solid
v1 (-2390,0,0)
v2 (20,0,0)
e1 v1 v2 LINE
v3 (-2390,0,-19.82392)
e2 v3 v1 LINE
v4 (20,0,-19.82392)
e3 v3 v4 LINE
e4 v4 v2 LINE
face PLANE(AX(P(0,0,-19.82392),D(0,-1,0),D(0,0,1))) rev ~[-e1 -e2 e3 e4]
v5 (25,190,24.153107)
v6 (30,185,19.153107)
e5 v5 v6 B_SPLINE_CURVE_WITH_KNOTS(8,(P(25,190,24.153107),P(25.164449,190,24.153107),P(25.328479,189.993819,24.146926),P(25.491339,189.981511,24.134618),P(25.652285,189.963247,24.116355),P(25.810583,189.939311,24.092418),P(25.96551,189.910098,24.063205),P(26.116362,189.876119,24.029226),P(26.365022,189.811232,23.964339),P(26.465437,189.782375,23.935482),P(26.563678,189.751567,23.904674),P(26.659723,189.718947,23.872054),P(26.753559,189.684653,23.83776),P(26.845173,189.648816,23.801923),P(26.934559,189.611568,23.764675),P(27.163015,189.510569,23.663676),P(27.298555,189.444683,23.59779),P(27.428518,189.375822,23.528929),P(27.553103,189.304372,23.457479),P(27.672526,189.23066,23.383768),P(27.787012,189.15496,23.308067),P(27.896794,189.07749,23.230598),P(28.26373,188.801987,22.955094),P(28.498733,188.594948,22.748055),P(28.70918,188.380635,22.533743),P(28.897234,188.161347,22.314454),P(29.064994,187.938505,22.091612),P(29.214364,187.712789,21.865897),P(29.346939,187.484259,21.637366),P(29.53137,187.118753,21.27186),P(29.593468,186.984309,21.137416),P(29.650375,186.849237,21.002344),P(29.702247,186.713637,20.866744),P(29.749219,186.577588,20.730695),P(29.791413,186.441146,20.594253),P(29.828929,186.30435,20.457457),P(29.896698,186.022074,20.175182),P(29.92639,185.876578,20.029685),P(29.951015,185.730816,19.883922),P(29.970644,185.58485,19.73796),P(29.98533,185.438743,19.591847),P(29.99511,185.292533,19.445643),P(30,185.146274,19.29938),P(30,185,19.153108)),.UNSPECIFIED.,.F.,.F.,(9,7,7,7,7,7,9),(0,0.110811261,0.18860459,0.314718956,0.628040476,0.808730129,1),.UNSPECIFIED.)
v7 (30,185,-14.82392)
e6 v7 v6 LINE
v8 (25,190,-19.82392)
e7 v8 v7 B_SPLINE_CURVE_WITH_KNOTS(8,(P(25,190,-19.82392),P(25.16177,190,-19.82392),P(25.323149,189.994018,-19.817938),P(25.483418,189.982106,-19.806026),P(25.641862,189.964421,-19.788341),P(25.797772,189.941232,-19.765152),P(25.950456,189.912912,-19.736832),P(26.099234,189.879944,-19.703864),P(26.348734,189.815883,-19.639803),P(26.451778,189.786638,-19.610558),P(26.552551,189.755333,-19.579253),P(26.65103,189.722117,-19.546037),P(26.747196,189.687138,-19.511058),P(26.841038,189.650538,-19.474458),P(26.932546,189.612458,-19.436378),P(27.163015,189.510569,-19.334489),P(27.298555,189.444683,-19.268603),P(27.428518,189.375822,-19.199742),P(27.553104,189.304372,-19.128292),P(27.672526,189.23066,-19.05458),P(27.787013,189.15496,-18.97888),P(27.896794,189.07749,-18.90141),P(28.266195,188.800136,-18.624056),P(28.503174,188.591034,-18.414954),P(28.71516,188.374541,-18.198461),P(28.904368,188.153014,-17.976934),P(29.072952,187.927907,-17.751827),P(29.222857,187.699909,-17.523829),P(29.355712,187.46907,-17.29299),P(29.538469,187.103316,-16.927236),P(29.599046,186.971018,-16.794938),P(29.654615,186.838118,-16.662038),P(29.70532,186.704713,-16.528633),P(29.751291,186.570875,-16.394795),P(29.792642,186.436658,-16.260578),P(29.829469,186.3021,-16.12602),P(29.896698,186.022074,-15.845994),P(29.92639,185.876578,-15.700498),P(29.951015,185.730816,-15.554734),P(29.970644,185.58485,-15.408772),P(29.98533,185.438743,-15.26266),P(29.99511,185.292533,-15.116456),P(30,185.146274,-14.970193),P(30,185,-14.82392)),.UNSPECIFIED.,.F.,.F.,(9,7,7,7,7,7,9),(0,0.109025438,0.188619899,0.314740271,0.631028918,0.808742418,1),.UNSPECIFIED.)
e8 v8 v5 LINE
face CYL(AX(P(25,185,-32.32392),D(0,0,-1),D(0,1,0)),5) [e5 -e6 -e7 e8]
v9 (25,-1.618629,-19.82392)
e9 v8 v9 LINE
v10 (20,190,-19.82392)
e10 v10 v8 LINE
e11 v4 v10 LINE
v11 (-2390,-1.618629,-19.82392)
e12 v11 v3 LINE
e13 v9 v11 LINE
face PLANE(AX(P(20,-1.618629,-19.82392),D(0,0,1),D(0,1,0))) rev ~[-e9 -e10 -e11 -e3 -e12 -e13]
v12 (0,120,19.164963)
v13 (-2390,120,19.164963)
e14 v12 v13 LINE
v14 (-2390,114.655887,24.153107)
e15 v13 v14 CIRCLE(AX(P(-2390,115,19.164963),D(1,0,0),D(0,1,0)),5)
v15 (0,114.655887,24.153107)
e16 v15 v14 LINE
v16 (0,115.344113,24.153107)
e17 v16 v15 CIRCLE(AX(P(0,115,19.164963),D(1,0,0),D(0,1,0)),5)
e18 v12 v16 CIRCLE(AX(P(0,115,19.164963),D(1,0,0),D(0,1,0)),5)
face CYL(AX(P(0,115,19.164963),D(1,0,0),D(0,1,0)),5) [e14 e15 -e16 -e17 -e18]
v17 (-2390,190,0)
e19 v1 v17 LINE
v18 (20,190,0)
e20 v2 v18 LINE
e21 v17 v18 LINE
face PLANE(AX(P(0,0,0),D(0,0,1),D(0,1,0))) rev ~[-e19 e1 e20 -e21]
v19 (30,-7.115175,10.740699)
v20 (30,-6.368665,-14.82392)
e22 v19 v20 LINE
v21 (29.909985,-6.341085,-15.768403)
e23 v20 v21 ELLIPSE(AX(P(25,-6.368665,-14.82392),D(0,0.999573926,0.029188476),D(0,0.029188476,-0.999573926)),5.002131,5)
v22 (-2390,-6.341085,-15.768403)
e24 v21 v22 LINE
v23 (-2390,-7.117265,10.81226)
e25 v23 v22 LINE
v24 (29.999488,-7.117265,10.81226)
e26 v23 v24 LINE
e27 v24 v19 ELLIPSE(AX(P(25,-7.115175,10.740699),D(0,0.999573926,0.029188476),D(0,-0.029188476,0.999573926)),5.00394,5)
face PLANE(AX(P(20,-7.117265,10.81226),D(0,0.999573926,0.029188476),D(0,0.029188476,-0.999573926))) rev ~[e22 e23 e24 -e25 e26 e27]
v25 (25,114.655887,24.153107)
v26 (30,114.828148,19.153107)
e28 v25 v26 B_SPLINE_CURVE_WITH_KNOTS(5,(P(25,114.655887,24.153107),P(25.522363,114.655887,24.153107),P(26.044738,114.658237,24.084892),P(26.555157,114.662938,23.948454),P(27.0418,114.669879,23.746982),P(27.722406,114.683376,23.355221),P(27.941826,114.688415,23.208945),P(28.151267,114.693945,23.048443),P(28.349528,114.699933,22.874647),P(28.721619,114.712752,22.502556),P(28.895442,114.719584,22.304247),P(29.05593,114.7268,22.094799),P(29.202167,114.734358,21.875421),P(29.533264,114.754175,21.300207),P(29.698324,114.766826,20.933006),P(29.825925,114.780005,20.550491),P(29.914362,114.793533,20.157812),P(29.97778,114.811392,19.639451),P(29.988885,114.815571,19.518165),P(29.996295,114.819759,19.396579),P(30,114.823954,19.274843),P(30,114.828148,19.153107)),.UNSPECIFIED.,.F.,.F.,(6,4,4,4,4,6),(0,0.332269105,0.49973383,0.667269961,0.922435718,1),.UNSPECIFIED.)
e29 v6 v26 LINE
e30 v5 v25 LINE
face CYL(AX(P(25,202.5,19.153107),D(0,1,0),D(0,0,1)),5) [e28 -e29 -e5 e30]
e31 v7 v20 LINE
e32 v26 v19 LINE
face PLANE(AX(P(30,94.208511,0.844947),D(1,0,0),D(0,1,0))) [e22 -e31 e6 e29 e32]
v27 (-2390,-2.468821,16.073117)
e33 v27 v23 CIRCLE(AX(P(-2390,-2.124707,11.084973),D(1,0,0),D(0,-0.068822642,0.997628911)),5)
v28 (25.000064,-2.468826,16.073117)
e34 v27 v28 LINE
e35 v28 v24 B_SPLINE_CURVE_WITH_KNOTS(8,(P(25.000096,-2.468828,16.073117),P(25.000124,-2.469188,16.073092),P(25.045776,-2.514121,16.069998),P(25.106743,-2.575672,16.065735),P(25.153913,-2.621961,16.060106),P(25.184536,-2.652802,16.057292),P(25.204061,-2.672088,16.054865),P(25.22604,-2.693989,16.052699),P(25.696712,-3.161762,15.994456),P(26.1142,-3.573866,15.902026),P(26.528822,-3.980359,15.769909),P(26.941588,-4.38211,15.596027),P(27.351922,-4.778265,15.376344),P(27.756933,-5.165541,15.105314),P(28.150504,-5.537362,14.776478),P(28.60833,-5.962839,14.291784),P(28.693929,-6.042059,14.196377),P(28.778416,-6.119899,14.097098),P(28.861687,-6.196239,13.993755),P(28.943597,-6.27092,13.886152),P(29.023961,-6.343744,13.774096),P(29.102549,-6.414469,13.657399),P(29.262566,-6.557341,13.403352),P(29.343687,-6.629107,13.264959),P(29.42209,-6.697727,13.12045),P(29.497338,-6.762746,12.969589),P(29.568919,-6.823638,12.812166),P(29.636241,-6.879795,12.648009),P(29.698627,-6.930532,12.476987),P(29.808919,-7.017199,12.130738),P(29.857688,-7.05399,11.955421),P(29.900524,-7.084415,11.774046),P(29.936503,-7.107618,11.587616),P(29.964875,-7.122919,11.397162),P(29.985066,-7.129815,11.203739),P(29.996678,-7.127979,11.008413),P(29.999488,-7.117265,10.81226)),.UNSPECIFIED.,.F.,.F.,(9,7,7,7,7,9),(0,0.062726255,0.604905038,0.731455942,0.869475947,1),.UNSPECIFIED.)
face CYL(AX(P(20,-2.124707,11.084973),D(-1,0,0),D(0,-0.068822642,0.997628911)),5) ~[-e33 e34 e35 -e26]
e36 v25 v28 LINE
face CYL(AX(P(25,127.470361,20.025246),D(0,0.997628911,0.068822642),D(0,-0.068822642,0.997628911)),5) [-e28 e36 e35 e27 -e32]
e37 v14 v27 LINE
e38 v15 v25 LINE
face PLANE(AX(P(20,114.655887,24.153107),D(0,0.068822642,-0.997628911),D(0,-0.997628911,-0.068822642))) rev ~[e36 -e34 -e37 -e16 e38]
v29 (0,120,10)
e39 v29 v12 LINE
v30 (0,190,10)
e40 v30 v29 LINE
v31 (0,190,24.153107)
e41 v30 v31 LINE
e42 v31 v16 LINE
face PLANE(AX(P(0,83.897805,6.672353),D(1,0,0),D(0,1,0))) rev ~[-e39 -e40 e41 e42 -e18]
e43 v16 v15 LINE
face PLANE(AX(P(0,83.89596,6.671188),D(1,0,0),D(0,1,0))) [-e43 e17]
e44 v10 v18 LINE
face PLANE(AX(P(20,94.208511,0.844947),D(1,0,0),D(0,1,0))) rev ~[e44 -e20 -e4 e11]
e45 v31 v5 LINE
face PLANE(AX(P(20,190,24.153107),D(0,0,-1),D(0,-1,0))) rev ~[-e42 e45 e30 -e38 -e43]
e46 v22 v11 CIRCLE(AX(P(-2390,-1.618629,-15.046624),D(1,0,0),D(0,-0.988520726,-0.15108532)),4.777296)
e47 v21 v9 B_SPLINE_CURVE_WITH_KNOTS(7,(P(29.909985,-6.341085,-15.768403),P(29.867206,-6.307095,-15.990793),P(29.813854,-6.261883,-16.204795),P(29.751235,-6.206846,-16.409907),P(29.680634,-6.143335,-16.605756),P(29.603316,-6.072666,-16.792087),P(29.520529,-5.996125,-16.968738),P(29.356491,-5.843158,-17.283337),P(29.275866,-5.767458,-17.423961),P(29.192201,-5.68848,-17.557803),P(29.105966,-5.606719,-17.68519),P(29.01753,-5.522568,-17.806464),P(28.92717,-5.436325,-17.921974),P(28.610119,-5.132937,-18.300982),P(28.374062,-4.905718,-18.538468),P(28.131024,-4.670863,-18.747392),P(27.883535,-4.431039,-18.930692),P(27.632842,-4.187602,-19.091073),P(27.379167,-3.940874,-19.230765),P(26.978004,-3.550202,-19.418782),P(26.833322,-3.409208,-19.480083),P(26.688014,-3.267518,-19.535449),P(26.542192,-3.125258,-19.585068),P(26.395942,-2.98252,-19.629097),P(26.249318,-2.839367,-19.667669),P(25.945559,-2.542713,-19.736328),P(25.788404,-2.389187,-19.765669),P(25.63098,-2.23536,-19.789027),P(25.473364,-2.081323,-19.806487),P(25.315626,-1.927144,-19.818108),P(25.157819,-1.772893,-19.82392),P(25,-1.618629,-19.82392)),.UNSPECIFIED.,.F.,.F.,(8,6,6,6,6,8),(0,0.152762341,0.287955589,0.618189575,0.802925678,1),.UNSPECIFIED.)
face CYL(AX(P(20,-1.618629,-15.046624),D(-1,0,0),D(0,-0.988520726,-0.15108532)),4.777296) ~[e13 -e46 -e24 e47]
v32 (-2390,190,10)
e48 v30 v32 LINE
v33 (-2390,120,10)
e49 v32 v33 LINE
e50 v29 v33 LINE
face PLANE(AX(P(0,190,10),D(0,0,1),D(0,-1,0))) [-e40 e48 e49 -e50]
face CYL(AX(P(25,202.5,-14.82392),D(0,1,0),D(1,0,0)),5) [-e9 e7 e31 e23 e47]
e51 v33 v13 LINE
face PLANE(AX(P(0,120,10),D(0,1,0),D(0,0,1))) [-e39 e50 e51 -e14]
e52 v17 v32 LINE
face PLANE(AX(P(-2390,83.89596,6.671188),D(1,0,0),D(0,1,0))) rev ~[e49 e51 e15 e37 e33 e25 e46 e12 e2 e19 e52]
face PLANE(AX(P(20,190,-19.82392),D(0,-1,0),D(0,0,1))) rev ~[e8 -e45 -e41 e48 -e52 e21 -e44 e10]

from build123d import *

# Parameters (mm, degrees)
F1_DEPTH    = 2390
F3_DEPTH    = 20
F5_DEPTH    = 10
F6_T1_DEPTH = 216.618628623
F6_T3_DEPTH = 142.4030805268
F6_T5_DEPTH = 100.344113211
F6_T7_DEPTH = 68.9770272469


# Not quite as in the source:
# - a fillet or chamfer that OpenCascade refuses, or shapes differently, is made with other operations: its cross-section is extruded or revolved along the edge and cut away or added


with BuildPart() as f1:
    # F0 (on Right) → F1 (new body)
    with BuildSketch(Plane.YZ):
        with BuildLine():
            Line((0, -19.8239199817), (0, 0))
            Line((0, 0), (190, 0))
            Line((190, 0), (190, 10))
            Line((190, 10), (120, 10))
            Line((120, 10), (120, 19.1649627105))
            ThreePointArc((120, 19.1649627105), (118.4117029432, 22.8201348033), (114.655886789, 24.1531072651))
            Line((114.655886789, 24.1531072651), (-2.4688205766, 16.0731170599))
            ThreePointArc((-2.4688205766, 16.0731170599), (-5.8715951564, 14.3956872139), (-7.1172645938, 10.8122596114))
            Line((-7.1172645938, 10.8122596114), (-6.3410848379, -15.7684031874))
            ThreePointArc((-6.3410848379, -15.7684031874), (-4.7310556973, -18.6708970152), (-1.618628623, -19.8239199817))
            Line((-1.618628623, -19.8239199817), (0, -19.8239199817))
        make_face()
    extrude(amount=-F1_DEPTH)

    # F2 (on face) → F3 (join)
    with BuildSketch(Plane.YZ):
        with BuildLine():
            ThreePointArc((-6.3410848379, -15.7684031874), (-4.7310556973, -18.6708970152), (-1.618628623, -19.8239199817))
            Line((-1.618628623, -19.8239199817), (0, -19.8239199817))
            Line((0, -19.8239199817), (0, 0))
            Line((0, 0), (190, 0))
            Line((190, 0), (190, 10))
            Line((190, 10), (120, 10))
            Line((120, 10), (120, 19.1649627105))
            ThreePointArc((120, 19.1649627105), (118.6551720927, 22.5766656537), (115.344113211, 24.1531072651))
            Line((115.344113211, 24.1531072651), (114.655886789, 24.1531072651))
            Line((114.655886789, 24.1531072651), (-2.4688205766, 16.0731170599))
            ThreePointArc((-2.4688205766, 16.0731170599), (-5.8715951564, 14.3956872139), (-7.1172645938, 10.8122596114))
            Line((-7.1172645938, 10.8122596114), (-6.3410848379, -15.7684031874))
        make_face()
        with BuildLine():
            Line((120, 10), (190, 10))
            Line((190, 10), (190, 24.1531072651))
            Line((190, 24.1531072651), (115.344113211, 24.1531072651))
            ThreePointArc((115.344113211, 24.1531072651), (118.6551720927, 22.5766656537), (120, 19.1649627105))
            Line((120, 19.1649627105), (120, 10))
        make_face()
    extrude(amount=F3_DEPTH)

    # F4 (on face) → F5 (join)
    with BuildSketch(Plane.YZ.offset(20)):
        with BuildLine():
            Line((190, -19.8239199817), (190, 0))
            Line((190, 0), (190, 24.1531072651))
            Line((190, 24.1531072651), (114.655886789, 24.1531072651))
            Line((114.655886789, 24.1531072651), (-2.4688205766, 16.0731170599))
            ThreePointArc((-2.4688205766, 16.0731170599), (-5.8715951564, 14.3956872139), (-7.1172645938, 10.8122596114))
            Line((-7.1172645938, 10.8122596114), (-6.3410848379, -15.7684031874))
            ThreePointArc((-6.3410848379, -15.7684031874), (-4.7310556973, -18.6708970152), (-1.618628623, -19.8239199817))
            Line((-1.618628623, -19.8239199817), (0, -19.8239199817))
            Line((0, -19.8239199817), (190, -19.8239199817))
        make_face()
    extrude(amount=F5_DEPTH)

    # F6: fillet of radius 5 on 4 edges, made by hand

    # F6_s2 → F6_t1 (cut)
    with BuildSketch(Plane.XZ.offset(-202.5)):
        with BuildLine():
            ThreePointArc((30, -14.8239199817), (28.5355339059, -18.3594538877), (25, -19.8239199817))
            Line((25, -19.8239199817), (30, -19.8239199817))
            Line((30, -19.8239199817), (30, -14.8239199817))
        make_face()
    extrude(amount=F6_T1_DEPTH, mode=Mode.SUBTRACT)

    # F6_s4 → F6_t3 (cut)
    with BuildSketch(Plane(origin=(0, 128.2415133818, 8.8468965716), x_dir=(1, 0, 0), z_dir=(0, -0.9976289109, -0.0688226422))):
        with BuildLine():
            ThreePointArc((25, 16.2049170229), (28.5355339059, 14.7404509288), (30, 11.2049170229))
            Line((30, 11.2049170229), (30, 16.2049170229))
            Line((30, 16.2049170229), (25, 16.2049170229))
        make_face()
    extrude(amount=F6_T3_DEPTH, mode=Mode.SUBTRACT)

    # F6_s6 → F6_t5 (cut)
    with BuildSketch(Plane.XZ.offset(-202.5)):
        with BuildLine():
            ThreePointArc((25, 24.1531072651), (28.5355339059, 22.6886411711), (30, 19.1531072651))
            Line((30, 19.1531072651), (30, 24.1531072651))
            Line((30, 24.1531072651), (25, 24.1531072651))
        make_face()
    extrude(amount=F6_T5_DEPTH, mode=Mode.SUBTRACT)

    # F6_s8 → F6_t7 (cut)
    with BuildSketch(Plane.XY.offset(-32.3239199817)):
        with BuildLine():
            ThreePointArc((25, 190), (28.5355339059, 188.5355339059), (30, 185))
            Line((30, 185), (30, 190))
            Line((30, 190), (25, 190))
        make_face()
    extrude(amount=F6_T7_DEPTH, mode=Mode.SUBTRACT)


solid = f1.part
